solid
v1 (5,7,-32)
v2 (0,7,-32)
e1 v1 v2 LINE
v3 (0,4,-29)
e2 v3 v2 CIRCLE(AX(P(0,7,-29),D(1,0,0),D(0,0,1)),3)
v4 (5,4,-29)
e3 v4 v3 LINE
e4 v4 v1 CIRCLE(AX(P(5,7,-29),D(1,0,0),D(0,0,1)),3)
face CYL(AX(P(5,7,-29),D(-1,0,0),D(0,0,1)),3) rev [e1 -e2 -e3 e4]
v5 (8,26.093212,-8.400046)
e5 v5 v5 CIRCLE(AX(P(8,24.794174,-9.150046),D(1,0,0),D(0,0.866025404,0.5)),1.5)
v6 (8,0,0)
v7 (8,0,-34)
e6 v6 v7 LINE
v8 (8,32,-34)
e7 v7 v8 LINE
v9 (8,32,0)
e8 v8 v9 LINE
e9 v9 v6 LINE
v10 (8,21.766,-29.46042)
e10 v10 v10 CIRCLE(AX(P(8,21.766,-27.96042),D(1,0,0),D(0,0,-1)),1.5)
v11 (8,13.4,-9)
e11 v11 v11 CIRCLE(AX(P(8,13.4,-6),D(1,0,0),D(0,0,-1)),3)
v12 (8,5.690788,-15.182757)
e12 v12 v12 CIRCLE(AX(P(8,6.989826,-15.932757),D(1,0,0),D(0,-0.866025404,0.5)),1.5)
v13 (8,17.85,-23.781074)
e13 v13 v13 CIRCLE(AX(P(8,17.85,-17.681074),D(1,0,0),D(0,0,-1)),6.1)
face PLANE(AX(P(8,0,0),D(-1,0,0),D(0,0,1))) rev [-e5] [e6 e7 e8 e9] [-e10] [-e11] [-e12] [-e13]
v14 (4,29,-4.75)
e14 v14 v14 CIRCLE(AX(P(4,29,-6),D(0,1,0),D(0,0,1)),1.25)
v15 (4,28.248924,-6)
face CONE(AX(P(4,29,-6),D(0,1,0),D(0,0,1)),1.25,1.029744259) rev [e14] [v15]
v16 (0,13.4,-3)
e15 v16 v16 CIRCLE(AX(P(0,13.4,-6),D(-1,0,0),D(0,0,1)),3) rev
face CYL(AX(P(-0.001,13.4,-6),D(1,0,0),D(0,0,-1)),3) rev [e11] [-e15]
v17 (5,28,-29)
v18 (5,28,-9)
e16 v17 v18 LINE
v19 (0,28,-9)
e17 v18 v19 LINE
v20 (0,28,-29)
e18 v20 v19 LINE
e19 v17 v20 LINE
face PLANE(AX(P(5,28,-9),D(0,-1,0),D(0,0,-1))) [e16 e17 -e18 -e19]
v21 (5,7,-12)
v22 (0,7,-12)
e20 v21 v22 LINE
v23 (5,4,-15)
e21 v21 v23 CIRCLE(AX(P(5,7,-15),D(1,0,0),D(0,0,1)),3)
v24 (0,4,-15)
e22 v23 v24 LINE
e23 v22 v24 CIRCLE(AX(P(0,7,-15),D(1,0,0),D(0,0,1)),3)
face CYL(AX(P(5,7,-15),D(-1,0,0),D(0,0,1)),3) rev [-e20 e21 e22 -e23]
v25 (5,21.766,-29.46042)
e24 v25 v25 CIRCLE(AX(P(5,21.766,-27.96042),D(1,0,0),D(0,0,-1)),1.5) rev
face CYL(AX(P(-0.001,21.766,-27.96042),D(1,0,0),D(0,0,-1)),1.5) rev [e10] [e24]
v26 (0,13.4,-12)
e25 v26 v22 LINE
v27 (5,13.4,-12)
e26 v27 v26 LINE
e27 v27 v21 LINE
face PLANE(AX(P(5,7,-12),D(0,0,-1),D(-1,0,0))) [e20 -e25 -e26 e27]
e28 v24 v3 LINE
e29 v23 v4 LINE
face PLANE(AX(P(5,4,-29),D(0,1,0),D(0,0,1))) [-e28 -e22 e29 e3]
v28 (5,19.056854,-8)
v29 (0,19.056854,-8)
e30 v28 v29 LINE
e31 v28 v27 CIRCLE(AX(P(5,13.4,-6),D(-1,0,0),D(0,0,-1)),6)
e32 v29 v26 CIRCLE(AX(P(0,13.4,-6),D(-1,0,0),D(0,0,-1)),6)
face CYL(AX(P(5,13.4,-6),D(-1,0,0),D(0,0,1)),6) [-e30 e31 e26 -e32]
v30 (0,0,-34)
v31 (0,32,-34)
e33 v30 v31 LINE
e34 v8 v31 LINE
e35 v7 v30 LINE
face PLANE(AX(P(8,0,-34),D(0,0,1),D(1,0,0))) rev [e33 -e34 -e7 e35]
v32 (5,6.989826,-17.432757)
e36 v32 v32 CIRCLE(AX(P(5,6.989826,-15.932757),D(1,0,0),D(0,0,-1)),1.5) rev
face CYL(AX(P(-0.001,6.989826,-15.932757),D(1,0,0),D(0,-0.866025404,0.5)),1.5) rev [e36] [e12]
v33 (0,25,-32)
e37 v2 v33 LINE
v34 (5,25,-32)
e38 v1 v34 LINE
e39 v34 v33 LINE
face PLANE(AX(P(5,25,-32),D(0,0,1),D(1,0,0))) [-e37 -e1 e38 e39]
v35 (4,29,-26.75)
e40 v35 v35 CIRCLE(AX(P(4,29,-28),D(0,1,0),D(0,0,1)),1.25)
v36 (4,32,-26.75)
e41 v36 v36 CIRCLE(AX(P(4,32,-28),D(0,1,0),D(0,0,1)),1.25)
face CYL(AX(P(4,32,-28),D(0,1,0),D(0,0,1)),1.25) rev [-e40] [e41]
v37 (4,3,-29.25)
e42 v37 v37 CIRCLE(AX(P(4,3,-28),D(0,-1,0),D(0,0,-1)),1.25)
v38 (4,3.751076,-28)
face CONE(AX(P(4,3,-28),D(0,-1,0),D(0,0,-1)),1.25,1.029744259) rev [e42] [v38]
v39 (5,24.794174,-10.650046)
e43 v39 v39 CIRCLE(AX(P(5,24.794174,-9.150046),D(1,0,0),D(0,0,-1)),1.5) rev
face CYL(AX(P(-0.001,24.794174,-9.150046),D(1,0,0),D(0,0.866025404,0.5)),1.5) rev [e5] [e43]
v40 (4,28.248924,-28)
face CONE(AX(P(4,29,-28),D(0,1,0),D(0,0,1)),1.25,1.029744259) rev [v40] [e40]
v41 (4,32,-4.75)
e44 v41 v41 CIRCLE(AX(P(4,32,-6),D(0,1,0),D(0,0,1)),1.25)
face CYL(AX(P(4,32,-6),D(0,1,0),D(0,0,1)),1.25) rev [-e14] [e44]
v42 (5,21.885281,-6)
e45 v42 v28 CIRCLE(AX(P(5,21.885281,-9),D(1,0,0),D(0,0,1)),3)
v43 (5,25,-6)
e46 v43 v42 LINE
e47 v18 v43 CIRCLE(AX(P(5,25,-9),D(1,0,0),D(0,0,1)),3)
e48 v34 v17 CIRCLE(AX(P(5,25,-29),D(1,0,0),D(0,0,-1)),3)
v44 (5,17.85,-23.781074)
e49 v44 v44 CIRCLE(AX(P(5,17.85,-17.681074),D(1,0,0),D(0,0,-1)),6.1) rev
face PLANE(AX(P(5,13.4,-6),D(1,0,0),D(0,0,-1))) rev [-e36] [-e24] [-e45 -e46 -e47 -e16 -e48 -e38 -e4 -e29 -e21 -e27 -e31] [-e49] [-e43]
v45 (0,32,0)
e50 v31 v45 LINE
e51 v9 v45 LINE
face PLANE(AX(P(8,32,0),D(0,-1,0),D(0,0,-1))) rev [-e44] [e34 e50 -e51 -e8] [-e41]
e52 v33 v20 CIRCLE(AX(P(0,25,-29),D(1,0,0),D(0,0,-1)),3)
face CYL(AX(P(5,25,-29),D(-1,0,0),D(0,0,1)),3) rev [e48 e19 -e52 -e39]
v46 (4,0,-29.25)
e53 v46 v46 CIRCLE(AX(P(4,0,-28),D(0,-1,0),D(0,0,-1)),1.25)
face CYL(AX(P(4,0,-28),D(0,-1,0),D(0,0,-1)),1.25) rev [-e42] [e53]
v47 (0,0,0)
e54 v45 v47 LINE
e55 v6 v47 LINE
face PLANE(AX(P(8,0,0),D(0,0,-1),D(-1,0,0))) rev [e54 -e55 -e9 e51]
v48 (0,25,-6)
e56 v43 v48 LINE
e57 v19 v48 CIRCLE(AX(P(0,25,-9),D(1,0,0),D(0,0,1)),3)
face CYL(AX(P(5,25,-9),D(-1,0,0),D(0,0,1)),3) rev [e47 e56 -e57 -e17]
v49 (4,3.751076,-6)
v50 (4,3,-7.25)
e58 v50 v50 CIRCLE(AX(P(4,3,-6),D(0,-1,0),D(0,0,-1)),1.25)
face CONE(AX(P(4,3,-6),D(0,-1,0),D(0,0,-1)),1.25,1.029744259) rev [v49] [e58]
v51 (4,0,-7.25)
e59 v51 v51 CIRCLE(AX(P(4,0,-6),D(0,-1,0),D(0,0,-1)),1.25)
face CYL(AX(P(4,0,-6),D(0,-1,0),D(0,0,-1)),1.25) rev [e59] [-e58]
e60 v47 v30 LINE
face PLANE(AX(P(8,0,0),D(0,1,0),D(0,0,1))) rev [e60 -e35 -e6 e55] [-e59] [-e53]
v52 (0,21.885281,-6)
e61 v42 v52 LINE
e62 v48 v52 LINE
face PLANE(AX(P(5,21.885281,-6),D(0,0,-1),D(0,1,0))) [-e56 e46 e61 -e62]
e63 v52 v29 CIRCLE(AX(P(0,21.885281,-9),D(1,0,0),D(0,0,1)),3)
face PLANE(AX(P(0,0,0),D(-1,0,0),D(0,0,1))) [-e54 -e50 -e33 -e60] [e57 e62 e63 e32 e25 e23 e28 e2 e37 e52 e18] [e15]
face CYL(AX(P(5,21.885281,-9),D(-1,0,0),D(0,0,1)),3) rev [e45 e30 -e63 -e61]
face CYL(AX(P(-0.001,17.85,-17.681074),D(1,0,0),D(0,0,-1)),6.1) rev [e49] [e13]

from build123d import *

# Parameters (mm, degrees)
SKETCH1_W                       = 34
SKETCH1_H                       = 32
BOSS_EXTRUDE1_DEPTH             = 8
CUT_EXTRUDE1_REACH              = 49.371
SKETCH2_R                       = 6.1
SKETCH2_R_2                     = 3
SKETCH2_R_3                     = 1.5
CIRPATTERN1_OUTLINE_R           = 1.5
CIRPATTERN1_DEPTH               = 8
CUT_EXTRUDE2_DEPTH              = 5
TAP_DRILL_FOR_M3X0_5_TAP1_D     = 2.5
TAP_DRILL_FOR_M3X0_5_TAP1_DEPTH = 3
TAP_DRILL_FOR_M3X0_5_TAP1_TIP   = 0.751075774
TAP_DRILL_FOR_M3X0_5_TAP2_D     = 2.5
TAP_DRILL_FOR_M3X0_5_TAP2_DEPTH = 3
TAP_DRILL_FOR_M3X0_5_TAP2_TIP   = 0.751075774


# Read off the part's stored shape, not the designer's step: CirPattern1
with BuildPart() as part:
    # Sketch1 → Boss-Extrude1 (new body)
    with BuildSketch(Plane(origin=(0, 0, 0), x_dir=(0, 0, -1), z_dir=(1, 0, 0))):
        with Locations((17, 16)):
            Rectangle(SKETCH1_W, SKETCH1_H)
    extrude(amount=BOSS_EXTRUDE1_DEPTH)

    # Sketch2 → Cut-Extrude1 (cut, up to next)
    with BuildSketch(Plane(origin=(8, 0, 0), x_dir=(0, 0, -1), z_dir=(1, 0, 0)), mode=Mode.PRIVATE) as cut_extrude1_sk1:
        with Locations((17.681074437, 17.85)):
            Circle(SKETCH2_R)
    cut_extrude1_tool1 = extrude(cut_extrude1_sk1.sketch, amount=-CUT_EXTRUDE1_REACH, mode=Mode.PRIVATE) & part.part
    # Sketch2 → Cut-Extrude1 (cut, up to next)
    with BuildSketch(Plane(origin=(8, 0, 0), x_dir=(0, 0, -1), z_dir=(1, 0, 0)), mode=Mode.PRIVATE) as cut_extrude1_sk2:
        with Locations((6, 13.4)):
            Circle(SKETCH2_R_2)
    cut_extrude1_tool2 = extrude(cut_extrude1_sk2.sketch, amount=-CUT_EXTRUDE1_REACH, mode=Mode.PRIVATE) & part.part
    # Sketch2 → Cut-Extrude1 (cut, up to next)
    with BuildSketch(Plane(origin=(8, 0, 0), x_dir=(0, 0, -1), z_dir=(1, 0, 0)), mode=Mode.PRIVATE) as cut_extrude1_sk3:
        with Locations((27.960419941, 21.766)):
            Circle(SKETCH2_R_3)
    cut_extrude1_tool3 = extrude(cut_extrude1_sk3.sketch, amount=-CUT_EXTRUDE1_REACH, mode=Mode.PRIVATE) & part.part
    add(cut_extrude1_tool1.solids().sort_by_distance((8, 17.85, -17.681074))[0], mode=Mode.SUBTRACT)
    add(cut_extrude1_tool2.solids().sort_by_distance((8, 13.4, -6))[0], mode=Mode.SUBTRACT)
    add(cut_extrude1_tool3.solids().sort_by_distance((8, 21.766, -27.96042))[0], mode=Mode.SUBTRACT)

    # CirPattern1 outline → CirPattern1 (cut)
    with BuildSketch(Plane.YZ):
        with Locations((6.989825659, -15.932757166)):
            Circle(CIRPATTERN1_OUTLINE_R)
        with Locations((24.794174341, -9.150046203)):
            Circle(CIRPATTERN1_OUTLINE_R)
    extrude(amount=CIRPATTERN1_DEPTH, mode=Mode.SUBTRACT)

    # Sketch3 → Cut-Extrude2 (cut)
    with BuildSketch(Plane(origin=(0, 0, 0), x_dir=(0, 0, -1), z_dir=(1, 0, 0))):
        with BuildLine():
            Line((32, 25), (32, 7))
            ThreePointArc((32, 7), (31.121320344, 4.878679656), (29, 4))
            Line((29, 4), (15, 4))
            ThreePointArc((15, 4), (12.878679656, 4.878679656), (12, 7))
            Line((12, 7), (12, 13.4))
            ThreePointArc((12, 13.4), (10.898979486, 16.864101615), (8, 19.056854249))
            ThreePointArc((8, 19.056854249), (6.550510257, 20.153230567), (6, 21.885281374))
            Line((6, 21.885281374), (6, 25))
            ThreePointArc((6, 25), (6.878679656, 27.121320344), (9, 28))
            Line((9, 28), (29, 28))
            ThreePointArc((29, 28), (31.121320344, 27.121320344), (32, 25))
        make_face()
    extrude(amount=CUT_EXTRUDE2_DEPTH, mode=Mode.SUBTRACT)

    # Tap Drill for M3x0.5 Tap1
    with Locations(Plane(origin=(0, 32, 0), x_dir=(-1, 0, 0), z_dir=(0, 1, 0))):
        with Locations((-4, -6), (-4, -28)):
            Hole(TAP_DRILL_FOR_M3X0_5_TAP1_D / 2, depth=TAP_DRILL_FOR_M3X0_5_TAP1_DEPTH)
            with Locations((0, 0, -(TAP_DRILL_FOR_M3X0_5_TAP1_DEPTH + TAP_DRILL_FOR_M3X0_5_TAP1_TIP / 2))):  # 118° drill point
                Cone(0, TAP_DRILL_FOR_M3X0_5_TAP1_D / 2, TAP_DRILL_FOR_M3X0_5_TAP1_TIP, mode=Mode.SUBTRACT)

    # Tap Drill for M3x0.5 Tap2
    with Locations(Plane.XZ):
        with Locations((4, -6), (4, -28)):
            Hole(TAP_DRILL_FOR_M3X0_5_TAP2_D / 2, depth=TAP_DRILL_FOR_M3X0_5_TAP2_DEPTH)
            with Locations((0, 0, -(TAP_DRILL_FOR_M3X0_5_TAP2_DEPTH + TAP_DRILL_FOR_M3X0_5_TAP2_TIP / 2))):  # 118° drill point
                Cone(0, TAP_DRILL_FOR_M3X0_5_TAP2_D / 2, TAP_DRILL_FOR_M3X0_5_TAP2_TIP, mode=Mode.SUBTRACT)


solid = part.part
